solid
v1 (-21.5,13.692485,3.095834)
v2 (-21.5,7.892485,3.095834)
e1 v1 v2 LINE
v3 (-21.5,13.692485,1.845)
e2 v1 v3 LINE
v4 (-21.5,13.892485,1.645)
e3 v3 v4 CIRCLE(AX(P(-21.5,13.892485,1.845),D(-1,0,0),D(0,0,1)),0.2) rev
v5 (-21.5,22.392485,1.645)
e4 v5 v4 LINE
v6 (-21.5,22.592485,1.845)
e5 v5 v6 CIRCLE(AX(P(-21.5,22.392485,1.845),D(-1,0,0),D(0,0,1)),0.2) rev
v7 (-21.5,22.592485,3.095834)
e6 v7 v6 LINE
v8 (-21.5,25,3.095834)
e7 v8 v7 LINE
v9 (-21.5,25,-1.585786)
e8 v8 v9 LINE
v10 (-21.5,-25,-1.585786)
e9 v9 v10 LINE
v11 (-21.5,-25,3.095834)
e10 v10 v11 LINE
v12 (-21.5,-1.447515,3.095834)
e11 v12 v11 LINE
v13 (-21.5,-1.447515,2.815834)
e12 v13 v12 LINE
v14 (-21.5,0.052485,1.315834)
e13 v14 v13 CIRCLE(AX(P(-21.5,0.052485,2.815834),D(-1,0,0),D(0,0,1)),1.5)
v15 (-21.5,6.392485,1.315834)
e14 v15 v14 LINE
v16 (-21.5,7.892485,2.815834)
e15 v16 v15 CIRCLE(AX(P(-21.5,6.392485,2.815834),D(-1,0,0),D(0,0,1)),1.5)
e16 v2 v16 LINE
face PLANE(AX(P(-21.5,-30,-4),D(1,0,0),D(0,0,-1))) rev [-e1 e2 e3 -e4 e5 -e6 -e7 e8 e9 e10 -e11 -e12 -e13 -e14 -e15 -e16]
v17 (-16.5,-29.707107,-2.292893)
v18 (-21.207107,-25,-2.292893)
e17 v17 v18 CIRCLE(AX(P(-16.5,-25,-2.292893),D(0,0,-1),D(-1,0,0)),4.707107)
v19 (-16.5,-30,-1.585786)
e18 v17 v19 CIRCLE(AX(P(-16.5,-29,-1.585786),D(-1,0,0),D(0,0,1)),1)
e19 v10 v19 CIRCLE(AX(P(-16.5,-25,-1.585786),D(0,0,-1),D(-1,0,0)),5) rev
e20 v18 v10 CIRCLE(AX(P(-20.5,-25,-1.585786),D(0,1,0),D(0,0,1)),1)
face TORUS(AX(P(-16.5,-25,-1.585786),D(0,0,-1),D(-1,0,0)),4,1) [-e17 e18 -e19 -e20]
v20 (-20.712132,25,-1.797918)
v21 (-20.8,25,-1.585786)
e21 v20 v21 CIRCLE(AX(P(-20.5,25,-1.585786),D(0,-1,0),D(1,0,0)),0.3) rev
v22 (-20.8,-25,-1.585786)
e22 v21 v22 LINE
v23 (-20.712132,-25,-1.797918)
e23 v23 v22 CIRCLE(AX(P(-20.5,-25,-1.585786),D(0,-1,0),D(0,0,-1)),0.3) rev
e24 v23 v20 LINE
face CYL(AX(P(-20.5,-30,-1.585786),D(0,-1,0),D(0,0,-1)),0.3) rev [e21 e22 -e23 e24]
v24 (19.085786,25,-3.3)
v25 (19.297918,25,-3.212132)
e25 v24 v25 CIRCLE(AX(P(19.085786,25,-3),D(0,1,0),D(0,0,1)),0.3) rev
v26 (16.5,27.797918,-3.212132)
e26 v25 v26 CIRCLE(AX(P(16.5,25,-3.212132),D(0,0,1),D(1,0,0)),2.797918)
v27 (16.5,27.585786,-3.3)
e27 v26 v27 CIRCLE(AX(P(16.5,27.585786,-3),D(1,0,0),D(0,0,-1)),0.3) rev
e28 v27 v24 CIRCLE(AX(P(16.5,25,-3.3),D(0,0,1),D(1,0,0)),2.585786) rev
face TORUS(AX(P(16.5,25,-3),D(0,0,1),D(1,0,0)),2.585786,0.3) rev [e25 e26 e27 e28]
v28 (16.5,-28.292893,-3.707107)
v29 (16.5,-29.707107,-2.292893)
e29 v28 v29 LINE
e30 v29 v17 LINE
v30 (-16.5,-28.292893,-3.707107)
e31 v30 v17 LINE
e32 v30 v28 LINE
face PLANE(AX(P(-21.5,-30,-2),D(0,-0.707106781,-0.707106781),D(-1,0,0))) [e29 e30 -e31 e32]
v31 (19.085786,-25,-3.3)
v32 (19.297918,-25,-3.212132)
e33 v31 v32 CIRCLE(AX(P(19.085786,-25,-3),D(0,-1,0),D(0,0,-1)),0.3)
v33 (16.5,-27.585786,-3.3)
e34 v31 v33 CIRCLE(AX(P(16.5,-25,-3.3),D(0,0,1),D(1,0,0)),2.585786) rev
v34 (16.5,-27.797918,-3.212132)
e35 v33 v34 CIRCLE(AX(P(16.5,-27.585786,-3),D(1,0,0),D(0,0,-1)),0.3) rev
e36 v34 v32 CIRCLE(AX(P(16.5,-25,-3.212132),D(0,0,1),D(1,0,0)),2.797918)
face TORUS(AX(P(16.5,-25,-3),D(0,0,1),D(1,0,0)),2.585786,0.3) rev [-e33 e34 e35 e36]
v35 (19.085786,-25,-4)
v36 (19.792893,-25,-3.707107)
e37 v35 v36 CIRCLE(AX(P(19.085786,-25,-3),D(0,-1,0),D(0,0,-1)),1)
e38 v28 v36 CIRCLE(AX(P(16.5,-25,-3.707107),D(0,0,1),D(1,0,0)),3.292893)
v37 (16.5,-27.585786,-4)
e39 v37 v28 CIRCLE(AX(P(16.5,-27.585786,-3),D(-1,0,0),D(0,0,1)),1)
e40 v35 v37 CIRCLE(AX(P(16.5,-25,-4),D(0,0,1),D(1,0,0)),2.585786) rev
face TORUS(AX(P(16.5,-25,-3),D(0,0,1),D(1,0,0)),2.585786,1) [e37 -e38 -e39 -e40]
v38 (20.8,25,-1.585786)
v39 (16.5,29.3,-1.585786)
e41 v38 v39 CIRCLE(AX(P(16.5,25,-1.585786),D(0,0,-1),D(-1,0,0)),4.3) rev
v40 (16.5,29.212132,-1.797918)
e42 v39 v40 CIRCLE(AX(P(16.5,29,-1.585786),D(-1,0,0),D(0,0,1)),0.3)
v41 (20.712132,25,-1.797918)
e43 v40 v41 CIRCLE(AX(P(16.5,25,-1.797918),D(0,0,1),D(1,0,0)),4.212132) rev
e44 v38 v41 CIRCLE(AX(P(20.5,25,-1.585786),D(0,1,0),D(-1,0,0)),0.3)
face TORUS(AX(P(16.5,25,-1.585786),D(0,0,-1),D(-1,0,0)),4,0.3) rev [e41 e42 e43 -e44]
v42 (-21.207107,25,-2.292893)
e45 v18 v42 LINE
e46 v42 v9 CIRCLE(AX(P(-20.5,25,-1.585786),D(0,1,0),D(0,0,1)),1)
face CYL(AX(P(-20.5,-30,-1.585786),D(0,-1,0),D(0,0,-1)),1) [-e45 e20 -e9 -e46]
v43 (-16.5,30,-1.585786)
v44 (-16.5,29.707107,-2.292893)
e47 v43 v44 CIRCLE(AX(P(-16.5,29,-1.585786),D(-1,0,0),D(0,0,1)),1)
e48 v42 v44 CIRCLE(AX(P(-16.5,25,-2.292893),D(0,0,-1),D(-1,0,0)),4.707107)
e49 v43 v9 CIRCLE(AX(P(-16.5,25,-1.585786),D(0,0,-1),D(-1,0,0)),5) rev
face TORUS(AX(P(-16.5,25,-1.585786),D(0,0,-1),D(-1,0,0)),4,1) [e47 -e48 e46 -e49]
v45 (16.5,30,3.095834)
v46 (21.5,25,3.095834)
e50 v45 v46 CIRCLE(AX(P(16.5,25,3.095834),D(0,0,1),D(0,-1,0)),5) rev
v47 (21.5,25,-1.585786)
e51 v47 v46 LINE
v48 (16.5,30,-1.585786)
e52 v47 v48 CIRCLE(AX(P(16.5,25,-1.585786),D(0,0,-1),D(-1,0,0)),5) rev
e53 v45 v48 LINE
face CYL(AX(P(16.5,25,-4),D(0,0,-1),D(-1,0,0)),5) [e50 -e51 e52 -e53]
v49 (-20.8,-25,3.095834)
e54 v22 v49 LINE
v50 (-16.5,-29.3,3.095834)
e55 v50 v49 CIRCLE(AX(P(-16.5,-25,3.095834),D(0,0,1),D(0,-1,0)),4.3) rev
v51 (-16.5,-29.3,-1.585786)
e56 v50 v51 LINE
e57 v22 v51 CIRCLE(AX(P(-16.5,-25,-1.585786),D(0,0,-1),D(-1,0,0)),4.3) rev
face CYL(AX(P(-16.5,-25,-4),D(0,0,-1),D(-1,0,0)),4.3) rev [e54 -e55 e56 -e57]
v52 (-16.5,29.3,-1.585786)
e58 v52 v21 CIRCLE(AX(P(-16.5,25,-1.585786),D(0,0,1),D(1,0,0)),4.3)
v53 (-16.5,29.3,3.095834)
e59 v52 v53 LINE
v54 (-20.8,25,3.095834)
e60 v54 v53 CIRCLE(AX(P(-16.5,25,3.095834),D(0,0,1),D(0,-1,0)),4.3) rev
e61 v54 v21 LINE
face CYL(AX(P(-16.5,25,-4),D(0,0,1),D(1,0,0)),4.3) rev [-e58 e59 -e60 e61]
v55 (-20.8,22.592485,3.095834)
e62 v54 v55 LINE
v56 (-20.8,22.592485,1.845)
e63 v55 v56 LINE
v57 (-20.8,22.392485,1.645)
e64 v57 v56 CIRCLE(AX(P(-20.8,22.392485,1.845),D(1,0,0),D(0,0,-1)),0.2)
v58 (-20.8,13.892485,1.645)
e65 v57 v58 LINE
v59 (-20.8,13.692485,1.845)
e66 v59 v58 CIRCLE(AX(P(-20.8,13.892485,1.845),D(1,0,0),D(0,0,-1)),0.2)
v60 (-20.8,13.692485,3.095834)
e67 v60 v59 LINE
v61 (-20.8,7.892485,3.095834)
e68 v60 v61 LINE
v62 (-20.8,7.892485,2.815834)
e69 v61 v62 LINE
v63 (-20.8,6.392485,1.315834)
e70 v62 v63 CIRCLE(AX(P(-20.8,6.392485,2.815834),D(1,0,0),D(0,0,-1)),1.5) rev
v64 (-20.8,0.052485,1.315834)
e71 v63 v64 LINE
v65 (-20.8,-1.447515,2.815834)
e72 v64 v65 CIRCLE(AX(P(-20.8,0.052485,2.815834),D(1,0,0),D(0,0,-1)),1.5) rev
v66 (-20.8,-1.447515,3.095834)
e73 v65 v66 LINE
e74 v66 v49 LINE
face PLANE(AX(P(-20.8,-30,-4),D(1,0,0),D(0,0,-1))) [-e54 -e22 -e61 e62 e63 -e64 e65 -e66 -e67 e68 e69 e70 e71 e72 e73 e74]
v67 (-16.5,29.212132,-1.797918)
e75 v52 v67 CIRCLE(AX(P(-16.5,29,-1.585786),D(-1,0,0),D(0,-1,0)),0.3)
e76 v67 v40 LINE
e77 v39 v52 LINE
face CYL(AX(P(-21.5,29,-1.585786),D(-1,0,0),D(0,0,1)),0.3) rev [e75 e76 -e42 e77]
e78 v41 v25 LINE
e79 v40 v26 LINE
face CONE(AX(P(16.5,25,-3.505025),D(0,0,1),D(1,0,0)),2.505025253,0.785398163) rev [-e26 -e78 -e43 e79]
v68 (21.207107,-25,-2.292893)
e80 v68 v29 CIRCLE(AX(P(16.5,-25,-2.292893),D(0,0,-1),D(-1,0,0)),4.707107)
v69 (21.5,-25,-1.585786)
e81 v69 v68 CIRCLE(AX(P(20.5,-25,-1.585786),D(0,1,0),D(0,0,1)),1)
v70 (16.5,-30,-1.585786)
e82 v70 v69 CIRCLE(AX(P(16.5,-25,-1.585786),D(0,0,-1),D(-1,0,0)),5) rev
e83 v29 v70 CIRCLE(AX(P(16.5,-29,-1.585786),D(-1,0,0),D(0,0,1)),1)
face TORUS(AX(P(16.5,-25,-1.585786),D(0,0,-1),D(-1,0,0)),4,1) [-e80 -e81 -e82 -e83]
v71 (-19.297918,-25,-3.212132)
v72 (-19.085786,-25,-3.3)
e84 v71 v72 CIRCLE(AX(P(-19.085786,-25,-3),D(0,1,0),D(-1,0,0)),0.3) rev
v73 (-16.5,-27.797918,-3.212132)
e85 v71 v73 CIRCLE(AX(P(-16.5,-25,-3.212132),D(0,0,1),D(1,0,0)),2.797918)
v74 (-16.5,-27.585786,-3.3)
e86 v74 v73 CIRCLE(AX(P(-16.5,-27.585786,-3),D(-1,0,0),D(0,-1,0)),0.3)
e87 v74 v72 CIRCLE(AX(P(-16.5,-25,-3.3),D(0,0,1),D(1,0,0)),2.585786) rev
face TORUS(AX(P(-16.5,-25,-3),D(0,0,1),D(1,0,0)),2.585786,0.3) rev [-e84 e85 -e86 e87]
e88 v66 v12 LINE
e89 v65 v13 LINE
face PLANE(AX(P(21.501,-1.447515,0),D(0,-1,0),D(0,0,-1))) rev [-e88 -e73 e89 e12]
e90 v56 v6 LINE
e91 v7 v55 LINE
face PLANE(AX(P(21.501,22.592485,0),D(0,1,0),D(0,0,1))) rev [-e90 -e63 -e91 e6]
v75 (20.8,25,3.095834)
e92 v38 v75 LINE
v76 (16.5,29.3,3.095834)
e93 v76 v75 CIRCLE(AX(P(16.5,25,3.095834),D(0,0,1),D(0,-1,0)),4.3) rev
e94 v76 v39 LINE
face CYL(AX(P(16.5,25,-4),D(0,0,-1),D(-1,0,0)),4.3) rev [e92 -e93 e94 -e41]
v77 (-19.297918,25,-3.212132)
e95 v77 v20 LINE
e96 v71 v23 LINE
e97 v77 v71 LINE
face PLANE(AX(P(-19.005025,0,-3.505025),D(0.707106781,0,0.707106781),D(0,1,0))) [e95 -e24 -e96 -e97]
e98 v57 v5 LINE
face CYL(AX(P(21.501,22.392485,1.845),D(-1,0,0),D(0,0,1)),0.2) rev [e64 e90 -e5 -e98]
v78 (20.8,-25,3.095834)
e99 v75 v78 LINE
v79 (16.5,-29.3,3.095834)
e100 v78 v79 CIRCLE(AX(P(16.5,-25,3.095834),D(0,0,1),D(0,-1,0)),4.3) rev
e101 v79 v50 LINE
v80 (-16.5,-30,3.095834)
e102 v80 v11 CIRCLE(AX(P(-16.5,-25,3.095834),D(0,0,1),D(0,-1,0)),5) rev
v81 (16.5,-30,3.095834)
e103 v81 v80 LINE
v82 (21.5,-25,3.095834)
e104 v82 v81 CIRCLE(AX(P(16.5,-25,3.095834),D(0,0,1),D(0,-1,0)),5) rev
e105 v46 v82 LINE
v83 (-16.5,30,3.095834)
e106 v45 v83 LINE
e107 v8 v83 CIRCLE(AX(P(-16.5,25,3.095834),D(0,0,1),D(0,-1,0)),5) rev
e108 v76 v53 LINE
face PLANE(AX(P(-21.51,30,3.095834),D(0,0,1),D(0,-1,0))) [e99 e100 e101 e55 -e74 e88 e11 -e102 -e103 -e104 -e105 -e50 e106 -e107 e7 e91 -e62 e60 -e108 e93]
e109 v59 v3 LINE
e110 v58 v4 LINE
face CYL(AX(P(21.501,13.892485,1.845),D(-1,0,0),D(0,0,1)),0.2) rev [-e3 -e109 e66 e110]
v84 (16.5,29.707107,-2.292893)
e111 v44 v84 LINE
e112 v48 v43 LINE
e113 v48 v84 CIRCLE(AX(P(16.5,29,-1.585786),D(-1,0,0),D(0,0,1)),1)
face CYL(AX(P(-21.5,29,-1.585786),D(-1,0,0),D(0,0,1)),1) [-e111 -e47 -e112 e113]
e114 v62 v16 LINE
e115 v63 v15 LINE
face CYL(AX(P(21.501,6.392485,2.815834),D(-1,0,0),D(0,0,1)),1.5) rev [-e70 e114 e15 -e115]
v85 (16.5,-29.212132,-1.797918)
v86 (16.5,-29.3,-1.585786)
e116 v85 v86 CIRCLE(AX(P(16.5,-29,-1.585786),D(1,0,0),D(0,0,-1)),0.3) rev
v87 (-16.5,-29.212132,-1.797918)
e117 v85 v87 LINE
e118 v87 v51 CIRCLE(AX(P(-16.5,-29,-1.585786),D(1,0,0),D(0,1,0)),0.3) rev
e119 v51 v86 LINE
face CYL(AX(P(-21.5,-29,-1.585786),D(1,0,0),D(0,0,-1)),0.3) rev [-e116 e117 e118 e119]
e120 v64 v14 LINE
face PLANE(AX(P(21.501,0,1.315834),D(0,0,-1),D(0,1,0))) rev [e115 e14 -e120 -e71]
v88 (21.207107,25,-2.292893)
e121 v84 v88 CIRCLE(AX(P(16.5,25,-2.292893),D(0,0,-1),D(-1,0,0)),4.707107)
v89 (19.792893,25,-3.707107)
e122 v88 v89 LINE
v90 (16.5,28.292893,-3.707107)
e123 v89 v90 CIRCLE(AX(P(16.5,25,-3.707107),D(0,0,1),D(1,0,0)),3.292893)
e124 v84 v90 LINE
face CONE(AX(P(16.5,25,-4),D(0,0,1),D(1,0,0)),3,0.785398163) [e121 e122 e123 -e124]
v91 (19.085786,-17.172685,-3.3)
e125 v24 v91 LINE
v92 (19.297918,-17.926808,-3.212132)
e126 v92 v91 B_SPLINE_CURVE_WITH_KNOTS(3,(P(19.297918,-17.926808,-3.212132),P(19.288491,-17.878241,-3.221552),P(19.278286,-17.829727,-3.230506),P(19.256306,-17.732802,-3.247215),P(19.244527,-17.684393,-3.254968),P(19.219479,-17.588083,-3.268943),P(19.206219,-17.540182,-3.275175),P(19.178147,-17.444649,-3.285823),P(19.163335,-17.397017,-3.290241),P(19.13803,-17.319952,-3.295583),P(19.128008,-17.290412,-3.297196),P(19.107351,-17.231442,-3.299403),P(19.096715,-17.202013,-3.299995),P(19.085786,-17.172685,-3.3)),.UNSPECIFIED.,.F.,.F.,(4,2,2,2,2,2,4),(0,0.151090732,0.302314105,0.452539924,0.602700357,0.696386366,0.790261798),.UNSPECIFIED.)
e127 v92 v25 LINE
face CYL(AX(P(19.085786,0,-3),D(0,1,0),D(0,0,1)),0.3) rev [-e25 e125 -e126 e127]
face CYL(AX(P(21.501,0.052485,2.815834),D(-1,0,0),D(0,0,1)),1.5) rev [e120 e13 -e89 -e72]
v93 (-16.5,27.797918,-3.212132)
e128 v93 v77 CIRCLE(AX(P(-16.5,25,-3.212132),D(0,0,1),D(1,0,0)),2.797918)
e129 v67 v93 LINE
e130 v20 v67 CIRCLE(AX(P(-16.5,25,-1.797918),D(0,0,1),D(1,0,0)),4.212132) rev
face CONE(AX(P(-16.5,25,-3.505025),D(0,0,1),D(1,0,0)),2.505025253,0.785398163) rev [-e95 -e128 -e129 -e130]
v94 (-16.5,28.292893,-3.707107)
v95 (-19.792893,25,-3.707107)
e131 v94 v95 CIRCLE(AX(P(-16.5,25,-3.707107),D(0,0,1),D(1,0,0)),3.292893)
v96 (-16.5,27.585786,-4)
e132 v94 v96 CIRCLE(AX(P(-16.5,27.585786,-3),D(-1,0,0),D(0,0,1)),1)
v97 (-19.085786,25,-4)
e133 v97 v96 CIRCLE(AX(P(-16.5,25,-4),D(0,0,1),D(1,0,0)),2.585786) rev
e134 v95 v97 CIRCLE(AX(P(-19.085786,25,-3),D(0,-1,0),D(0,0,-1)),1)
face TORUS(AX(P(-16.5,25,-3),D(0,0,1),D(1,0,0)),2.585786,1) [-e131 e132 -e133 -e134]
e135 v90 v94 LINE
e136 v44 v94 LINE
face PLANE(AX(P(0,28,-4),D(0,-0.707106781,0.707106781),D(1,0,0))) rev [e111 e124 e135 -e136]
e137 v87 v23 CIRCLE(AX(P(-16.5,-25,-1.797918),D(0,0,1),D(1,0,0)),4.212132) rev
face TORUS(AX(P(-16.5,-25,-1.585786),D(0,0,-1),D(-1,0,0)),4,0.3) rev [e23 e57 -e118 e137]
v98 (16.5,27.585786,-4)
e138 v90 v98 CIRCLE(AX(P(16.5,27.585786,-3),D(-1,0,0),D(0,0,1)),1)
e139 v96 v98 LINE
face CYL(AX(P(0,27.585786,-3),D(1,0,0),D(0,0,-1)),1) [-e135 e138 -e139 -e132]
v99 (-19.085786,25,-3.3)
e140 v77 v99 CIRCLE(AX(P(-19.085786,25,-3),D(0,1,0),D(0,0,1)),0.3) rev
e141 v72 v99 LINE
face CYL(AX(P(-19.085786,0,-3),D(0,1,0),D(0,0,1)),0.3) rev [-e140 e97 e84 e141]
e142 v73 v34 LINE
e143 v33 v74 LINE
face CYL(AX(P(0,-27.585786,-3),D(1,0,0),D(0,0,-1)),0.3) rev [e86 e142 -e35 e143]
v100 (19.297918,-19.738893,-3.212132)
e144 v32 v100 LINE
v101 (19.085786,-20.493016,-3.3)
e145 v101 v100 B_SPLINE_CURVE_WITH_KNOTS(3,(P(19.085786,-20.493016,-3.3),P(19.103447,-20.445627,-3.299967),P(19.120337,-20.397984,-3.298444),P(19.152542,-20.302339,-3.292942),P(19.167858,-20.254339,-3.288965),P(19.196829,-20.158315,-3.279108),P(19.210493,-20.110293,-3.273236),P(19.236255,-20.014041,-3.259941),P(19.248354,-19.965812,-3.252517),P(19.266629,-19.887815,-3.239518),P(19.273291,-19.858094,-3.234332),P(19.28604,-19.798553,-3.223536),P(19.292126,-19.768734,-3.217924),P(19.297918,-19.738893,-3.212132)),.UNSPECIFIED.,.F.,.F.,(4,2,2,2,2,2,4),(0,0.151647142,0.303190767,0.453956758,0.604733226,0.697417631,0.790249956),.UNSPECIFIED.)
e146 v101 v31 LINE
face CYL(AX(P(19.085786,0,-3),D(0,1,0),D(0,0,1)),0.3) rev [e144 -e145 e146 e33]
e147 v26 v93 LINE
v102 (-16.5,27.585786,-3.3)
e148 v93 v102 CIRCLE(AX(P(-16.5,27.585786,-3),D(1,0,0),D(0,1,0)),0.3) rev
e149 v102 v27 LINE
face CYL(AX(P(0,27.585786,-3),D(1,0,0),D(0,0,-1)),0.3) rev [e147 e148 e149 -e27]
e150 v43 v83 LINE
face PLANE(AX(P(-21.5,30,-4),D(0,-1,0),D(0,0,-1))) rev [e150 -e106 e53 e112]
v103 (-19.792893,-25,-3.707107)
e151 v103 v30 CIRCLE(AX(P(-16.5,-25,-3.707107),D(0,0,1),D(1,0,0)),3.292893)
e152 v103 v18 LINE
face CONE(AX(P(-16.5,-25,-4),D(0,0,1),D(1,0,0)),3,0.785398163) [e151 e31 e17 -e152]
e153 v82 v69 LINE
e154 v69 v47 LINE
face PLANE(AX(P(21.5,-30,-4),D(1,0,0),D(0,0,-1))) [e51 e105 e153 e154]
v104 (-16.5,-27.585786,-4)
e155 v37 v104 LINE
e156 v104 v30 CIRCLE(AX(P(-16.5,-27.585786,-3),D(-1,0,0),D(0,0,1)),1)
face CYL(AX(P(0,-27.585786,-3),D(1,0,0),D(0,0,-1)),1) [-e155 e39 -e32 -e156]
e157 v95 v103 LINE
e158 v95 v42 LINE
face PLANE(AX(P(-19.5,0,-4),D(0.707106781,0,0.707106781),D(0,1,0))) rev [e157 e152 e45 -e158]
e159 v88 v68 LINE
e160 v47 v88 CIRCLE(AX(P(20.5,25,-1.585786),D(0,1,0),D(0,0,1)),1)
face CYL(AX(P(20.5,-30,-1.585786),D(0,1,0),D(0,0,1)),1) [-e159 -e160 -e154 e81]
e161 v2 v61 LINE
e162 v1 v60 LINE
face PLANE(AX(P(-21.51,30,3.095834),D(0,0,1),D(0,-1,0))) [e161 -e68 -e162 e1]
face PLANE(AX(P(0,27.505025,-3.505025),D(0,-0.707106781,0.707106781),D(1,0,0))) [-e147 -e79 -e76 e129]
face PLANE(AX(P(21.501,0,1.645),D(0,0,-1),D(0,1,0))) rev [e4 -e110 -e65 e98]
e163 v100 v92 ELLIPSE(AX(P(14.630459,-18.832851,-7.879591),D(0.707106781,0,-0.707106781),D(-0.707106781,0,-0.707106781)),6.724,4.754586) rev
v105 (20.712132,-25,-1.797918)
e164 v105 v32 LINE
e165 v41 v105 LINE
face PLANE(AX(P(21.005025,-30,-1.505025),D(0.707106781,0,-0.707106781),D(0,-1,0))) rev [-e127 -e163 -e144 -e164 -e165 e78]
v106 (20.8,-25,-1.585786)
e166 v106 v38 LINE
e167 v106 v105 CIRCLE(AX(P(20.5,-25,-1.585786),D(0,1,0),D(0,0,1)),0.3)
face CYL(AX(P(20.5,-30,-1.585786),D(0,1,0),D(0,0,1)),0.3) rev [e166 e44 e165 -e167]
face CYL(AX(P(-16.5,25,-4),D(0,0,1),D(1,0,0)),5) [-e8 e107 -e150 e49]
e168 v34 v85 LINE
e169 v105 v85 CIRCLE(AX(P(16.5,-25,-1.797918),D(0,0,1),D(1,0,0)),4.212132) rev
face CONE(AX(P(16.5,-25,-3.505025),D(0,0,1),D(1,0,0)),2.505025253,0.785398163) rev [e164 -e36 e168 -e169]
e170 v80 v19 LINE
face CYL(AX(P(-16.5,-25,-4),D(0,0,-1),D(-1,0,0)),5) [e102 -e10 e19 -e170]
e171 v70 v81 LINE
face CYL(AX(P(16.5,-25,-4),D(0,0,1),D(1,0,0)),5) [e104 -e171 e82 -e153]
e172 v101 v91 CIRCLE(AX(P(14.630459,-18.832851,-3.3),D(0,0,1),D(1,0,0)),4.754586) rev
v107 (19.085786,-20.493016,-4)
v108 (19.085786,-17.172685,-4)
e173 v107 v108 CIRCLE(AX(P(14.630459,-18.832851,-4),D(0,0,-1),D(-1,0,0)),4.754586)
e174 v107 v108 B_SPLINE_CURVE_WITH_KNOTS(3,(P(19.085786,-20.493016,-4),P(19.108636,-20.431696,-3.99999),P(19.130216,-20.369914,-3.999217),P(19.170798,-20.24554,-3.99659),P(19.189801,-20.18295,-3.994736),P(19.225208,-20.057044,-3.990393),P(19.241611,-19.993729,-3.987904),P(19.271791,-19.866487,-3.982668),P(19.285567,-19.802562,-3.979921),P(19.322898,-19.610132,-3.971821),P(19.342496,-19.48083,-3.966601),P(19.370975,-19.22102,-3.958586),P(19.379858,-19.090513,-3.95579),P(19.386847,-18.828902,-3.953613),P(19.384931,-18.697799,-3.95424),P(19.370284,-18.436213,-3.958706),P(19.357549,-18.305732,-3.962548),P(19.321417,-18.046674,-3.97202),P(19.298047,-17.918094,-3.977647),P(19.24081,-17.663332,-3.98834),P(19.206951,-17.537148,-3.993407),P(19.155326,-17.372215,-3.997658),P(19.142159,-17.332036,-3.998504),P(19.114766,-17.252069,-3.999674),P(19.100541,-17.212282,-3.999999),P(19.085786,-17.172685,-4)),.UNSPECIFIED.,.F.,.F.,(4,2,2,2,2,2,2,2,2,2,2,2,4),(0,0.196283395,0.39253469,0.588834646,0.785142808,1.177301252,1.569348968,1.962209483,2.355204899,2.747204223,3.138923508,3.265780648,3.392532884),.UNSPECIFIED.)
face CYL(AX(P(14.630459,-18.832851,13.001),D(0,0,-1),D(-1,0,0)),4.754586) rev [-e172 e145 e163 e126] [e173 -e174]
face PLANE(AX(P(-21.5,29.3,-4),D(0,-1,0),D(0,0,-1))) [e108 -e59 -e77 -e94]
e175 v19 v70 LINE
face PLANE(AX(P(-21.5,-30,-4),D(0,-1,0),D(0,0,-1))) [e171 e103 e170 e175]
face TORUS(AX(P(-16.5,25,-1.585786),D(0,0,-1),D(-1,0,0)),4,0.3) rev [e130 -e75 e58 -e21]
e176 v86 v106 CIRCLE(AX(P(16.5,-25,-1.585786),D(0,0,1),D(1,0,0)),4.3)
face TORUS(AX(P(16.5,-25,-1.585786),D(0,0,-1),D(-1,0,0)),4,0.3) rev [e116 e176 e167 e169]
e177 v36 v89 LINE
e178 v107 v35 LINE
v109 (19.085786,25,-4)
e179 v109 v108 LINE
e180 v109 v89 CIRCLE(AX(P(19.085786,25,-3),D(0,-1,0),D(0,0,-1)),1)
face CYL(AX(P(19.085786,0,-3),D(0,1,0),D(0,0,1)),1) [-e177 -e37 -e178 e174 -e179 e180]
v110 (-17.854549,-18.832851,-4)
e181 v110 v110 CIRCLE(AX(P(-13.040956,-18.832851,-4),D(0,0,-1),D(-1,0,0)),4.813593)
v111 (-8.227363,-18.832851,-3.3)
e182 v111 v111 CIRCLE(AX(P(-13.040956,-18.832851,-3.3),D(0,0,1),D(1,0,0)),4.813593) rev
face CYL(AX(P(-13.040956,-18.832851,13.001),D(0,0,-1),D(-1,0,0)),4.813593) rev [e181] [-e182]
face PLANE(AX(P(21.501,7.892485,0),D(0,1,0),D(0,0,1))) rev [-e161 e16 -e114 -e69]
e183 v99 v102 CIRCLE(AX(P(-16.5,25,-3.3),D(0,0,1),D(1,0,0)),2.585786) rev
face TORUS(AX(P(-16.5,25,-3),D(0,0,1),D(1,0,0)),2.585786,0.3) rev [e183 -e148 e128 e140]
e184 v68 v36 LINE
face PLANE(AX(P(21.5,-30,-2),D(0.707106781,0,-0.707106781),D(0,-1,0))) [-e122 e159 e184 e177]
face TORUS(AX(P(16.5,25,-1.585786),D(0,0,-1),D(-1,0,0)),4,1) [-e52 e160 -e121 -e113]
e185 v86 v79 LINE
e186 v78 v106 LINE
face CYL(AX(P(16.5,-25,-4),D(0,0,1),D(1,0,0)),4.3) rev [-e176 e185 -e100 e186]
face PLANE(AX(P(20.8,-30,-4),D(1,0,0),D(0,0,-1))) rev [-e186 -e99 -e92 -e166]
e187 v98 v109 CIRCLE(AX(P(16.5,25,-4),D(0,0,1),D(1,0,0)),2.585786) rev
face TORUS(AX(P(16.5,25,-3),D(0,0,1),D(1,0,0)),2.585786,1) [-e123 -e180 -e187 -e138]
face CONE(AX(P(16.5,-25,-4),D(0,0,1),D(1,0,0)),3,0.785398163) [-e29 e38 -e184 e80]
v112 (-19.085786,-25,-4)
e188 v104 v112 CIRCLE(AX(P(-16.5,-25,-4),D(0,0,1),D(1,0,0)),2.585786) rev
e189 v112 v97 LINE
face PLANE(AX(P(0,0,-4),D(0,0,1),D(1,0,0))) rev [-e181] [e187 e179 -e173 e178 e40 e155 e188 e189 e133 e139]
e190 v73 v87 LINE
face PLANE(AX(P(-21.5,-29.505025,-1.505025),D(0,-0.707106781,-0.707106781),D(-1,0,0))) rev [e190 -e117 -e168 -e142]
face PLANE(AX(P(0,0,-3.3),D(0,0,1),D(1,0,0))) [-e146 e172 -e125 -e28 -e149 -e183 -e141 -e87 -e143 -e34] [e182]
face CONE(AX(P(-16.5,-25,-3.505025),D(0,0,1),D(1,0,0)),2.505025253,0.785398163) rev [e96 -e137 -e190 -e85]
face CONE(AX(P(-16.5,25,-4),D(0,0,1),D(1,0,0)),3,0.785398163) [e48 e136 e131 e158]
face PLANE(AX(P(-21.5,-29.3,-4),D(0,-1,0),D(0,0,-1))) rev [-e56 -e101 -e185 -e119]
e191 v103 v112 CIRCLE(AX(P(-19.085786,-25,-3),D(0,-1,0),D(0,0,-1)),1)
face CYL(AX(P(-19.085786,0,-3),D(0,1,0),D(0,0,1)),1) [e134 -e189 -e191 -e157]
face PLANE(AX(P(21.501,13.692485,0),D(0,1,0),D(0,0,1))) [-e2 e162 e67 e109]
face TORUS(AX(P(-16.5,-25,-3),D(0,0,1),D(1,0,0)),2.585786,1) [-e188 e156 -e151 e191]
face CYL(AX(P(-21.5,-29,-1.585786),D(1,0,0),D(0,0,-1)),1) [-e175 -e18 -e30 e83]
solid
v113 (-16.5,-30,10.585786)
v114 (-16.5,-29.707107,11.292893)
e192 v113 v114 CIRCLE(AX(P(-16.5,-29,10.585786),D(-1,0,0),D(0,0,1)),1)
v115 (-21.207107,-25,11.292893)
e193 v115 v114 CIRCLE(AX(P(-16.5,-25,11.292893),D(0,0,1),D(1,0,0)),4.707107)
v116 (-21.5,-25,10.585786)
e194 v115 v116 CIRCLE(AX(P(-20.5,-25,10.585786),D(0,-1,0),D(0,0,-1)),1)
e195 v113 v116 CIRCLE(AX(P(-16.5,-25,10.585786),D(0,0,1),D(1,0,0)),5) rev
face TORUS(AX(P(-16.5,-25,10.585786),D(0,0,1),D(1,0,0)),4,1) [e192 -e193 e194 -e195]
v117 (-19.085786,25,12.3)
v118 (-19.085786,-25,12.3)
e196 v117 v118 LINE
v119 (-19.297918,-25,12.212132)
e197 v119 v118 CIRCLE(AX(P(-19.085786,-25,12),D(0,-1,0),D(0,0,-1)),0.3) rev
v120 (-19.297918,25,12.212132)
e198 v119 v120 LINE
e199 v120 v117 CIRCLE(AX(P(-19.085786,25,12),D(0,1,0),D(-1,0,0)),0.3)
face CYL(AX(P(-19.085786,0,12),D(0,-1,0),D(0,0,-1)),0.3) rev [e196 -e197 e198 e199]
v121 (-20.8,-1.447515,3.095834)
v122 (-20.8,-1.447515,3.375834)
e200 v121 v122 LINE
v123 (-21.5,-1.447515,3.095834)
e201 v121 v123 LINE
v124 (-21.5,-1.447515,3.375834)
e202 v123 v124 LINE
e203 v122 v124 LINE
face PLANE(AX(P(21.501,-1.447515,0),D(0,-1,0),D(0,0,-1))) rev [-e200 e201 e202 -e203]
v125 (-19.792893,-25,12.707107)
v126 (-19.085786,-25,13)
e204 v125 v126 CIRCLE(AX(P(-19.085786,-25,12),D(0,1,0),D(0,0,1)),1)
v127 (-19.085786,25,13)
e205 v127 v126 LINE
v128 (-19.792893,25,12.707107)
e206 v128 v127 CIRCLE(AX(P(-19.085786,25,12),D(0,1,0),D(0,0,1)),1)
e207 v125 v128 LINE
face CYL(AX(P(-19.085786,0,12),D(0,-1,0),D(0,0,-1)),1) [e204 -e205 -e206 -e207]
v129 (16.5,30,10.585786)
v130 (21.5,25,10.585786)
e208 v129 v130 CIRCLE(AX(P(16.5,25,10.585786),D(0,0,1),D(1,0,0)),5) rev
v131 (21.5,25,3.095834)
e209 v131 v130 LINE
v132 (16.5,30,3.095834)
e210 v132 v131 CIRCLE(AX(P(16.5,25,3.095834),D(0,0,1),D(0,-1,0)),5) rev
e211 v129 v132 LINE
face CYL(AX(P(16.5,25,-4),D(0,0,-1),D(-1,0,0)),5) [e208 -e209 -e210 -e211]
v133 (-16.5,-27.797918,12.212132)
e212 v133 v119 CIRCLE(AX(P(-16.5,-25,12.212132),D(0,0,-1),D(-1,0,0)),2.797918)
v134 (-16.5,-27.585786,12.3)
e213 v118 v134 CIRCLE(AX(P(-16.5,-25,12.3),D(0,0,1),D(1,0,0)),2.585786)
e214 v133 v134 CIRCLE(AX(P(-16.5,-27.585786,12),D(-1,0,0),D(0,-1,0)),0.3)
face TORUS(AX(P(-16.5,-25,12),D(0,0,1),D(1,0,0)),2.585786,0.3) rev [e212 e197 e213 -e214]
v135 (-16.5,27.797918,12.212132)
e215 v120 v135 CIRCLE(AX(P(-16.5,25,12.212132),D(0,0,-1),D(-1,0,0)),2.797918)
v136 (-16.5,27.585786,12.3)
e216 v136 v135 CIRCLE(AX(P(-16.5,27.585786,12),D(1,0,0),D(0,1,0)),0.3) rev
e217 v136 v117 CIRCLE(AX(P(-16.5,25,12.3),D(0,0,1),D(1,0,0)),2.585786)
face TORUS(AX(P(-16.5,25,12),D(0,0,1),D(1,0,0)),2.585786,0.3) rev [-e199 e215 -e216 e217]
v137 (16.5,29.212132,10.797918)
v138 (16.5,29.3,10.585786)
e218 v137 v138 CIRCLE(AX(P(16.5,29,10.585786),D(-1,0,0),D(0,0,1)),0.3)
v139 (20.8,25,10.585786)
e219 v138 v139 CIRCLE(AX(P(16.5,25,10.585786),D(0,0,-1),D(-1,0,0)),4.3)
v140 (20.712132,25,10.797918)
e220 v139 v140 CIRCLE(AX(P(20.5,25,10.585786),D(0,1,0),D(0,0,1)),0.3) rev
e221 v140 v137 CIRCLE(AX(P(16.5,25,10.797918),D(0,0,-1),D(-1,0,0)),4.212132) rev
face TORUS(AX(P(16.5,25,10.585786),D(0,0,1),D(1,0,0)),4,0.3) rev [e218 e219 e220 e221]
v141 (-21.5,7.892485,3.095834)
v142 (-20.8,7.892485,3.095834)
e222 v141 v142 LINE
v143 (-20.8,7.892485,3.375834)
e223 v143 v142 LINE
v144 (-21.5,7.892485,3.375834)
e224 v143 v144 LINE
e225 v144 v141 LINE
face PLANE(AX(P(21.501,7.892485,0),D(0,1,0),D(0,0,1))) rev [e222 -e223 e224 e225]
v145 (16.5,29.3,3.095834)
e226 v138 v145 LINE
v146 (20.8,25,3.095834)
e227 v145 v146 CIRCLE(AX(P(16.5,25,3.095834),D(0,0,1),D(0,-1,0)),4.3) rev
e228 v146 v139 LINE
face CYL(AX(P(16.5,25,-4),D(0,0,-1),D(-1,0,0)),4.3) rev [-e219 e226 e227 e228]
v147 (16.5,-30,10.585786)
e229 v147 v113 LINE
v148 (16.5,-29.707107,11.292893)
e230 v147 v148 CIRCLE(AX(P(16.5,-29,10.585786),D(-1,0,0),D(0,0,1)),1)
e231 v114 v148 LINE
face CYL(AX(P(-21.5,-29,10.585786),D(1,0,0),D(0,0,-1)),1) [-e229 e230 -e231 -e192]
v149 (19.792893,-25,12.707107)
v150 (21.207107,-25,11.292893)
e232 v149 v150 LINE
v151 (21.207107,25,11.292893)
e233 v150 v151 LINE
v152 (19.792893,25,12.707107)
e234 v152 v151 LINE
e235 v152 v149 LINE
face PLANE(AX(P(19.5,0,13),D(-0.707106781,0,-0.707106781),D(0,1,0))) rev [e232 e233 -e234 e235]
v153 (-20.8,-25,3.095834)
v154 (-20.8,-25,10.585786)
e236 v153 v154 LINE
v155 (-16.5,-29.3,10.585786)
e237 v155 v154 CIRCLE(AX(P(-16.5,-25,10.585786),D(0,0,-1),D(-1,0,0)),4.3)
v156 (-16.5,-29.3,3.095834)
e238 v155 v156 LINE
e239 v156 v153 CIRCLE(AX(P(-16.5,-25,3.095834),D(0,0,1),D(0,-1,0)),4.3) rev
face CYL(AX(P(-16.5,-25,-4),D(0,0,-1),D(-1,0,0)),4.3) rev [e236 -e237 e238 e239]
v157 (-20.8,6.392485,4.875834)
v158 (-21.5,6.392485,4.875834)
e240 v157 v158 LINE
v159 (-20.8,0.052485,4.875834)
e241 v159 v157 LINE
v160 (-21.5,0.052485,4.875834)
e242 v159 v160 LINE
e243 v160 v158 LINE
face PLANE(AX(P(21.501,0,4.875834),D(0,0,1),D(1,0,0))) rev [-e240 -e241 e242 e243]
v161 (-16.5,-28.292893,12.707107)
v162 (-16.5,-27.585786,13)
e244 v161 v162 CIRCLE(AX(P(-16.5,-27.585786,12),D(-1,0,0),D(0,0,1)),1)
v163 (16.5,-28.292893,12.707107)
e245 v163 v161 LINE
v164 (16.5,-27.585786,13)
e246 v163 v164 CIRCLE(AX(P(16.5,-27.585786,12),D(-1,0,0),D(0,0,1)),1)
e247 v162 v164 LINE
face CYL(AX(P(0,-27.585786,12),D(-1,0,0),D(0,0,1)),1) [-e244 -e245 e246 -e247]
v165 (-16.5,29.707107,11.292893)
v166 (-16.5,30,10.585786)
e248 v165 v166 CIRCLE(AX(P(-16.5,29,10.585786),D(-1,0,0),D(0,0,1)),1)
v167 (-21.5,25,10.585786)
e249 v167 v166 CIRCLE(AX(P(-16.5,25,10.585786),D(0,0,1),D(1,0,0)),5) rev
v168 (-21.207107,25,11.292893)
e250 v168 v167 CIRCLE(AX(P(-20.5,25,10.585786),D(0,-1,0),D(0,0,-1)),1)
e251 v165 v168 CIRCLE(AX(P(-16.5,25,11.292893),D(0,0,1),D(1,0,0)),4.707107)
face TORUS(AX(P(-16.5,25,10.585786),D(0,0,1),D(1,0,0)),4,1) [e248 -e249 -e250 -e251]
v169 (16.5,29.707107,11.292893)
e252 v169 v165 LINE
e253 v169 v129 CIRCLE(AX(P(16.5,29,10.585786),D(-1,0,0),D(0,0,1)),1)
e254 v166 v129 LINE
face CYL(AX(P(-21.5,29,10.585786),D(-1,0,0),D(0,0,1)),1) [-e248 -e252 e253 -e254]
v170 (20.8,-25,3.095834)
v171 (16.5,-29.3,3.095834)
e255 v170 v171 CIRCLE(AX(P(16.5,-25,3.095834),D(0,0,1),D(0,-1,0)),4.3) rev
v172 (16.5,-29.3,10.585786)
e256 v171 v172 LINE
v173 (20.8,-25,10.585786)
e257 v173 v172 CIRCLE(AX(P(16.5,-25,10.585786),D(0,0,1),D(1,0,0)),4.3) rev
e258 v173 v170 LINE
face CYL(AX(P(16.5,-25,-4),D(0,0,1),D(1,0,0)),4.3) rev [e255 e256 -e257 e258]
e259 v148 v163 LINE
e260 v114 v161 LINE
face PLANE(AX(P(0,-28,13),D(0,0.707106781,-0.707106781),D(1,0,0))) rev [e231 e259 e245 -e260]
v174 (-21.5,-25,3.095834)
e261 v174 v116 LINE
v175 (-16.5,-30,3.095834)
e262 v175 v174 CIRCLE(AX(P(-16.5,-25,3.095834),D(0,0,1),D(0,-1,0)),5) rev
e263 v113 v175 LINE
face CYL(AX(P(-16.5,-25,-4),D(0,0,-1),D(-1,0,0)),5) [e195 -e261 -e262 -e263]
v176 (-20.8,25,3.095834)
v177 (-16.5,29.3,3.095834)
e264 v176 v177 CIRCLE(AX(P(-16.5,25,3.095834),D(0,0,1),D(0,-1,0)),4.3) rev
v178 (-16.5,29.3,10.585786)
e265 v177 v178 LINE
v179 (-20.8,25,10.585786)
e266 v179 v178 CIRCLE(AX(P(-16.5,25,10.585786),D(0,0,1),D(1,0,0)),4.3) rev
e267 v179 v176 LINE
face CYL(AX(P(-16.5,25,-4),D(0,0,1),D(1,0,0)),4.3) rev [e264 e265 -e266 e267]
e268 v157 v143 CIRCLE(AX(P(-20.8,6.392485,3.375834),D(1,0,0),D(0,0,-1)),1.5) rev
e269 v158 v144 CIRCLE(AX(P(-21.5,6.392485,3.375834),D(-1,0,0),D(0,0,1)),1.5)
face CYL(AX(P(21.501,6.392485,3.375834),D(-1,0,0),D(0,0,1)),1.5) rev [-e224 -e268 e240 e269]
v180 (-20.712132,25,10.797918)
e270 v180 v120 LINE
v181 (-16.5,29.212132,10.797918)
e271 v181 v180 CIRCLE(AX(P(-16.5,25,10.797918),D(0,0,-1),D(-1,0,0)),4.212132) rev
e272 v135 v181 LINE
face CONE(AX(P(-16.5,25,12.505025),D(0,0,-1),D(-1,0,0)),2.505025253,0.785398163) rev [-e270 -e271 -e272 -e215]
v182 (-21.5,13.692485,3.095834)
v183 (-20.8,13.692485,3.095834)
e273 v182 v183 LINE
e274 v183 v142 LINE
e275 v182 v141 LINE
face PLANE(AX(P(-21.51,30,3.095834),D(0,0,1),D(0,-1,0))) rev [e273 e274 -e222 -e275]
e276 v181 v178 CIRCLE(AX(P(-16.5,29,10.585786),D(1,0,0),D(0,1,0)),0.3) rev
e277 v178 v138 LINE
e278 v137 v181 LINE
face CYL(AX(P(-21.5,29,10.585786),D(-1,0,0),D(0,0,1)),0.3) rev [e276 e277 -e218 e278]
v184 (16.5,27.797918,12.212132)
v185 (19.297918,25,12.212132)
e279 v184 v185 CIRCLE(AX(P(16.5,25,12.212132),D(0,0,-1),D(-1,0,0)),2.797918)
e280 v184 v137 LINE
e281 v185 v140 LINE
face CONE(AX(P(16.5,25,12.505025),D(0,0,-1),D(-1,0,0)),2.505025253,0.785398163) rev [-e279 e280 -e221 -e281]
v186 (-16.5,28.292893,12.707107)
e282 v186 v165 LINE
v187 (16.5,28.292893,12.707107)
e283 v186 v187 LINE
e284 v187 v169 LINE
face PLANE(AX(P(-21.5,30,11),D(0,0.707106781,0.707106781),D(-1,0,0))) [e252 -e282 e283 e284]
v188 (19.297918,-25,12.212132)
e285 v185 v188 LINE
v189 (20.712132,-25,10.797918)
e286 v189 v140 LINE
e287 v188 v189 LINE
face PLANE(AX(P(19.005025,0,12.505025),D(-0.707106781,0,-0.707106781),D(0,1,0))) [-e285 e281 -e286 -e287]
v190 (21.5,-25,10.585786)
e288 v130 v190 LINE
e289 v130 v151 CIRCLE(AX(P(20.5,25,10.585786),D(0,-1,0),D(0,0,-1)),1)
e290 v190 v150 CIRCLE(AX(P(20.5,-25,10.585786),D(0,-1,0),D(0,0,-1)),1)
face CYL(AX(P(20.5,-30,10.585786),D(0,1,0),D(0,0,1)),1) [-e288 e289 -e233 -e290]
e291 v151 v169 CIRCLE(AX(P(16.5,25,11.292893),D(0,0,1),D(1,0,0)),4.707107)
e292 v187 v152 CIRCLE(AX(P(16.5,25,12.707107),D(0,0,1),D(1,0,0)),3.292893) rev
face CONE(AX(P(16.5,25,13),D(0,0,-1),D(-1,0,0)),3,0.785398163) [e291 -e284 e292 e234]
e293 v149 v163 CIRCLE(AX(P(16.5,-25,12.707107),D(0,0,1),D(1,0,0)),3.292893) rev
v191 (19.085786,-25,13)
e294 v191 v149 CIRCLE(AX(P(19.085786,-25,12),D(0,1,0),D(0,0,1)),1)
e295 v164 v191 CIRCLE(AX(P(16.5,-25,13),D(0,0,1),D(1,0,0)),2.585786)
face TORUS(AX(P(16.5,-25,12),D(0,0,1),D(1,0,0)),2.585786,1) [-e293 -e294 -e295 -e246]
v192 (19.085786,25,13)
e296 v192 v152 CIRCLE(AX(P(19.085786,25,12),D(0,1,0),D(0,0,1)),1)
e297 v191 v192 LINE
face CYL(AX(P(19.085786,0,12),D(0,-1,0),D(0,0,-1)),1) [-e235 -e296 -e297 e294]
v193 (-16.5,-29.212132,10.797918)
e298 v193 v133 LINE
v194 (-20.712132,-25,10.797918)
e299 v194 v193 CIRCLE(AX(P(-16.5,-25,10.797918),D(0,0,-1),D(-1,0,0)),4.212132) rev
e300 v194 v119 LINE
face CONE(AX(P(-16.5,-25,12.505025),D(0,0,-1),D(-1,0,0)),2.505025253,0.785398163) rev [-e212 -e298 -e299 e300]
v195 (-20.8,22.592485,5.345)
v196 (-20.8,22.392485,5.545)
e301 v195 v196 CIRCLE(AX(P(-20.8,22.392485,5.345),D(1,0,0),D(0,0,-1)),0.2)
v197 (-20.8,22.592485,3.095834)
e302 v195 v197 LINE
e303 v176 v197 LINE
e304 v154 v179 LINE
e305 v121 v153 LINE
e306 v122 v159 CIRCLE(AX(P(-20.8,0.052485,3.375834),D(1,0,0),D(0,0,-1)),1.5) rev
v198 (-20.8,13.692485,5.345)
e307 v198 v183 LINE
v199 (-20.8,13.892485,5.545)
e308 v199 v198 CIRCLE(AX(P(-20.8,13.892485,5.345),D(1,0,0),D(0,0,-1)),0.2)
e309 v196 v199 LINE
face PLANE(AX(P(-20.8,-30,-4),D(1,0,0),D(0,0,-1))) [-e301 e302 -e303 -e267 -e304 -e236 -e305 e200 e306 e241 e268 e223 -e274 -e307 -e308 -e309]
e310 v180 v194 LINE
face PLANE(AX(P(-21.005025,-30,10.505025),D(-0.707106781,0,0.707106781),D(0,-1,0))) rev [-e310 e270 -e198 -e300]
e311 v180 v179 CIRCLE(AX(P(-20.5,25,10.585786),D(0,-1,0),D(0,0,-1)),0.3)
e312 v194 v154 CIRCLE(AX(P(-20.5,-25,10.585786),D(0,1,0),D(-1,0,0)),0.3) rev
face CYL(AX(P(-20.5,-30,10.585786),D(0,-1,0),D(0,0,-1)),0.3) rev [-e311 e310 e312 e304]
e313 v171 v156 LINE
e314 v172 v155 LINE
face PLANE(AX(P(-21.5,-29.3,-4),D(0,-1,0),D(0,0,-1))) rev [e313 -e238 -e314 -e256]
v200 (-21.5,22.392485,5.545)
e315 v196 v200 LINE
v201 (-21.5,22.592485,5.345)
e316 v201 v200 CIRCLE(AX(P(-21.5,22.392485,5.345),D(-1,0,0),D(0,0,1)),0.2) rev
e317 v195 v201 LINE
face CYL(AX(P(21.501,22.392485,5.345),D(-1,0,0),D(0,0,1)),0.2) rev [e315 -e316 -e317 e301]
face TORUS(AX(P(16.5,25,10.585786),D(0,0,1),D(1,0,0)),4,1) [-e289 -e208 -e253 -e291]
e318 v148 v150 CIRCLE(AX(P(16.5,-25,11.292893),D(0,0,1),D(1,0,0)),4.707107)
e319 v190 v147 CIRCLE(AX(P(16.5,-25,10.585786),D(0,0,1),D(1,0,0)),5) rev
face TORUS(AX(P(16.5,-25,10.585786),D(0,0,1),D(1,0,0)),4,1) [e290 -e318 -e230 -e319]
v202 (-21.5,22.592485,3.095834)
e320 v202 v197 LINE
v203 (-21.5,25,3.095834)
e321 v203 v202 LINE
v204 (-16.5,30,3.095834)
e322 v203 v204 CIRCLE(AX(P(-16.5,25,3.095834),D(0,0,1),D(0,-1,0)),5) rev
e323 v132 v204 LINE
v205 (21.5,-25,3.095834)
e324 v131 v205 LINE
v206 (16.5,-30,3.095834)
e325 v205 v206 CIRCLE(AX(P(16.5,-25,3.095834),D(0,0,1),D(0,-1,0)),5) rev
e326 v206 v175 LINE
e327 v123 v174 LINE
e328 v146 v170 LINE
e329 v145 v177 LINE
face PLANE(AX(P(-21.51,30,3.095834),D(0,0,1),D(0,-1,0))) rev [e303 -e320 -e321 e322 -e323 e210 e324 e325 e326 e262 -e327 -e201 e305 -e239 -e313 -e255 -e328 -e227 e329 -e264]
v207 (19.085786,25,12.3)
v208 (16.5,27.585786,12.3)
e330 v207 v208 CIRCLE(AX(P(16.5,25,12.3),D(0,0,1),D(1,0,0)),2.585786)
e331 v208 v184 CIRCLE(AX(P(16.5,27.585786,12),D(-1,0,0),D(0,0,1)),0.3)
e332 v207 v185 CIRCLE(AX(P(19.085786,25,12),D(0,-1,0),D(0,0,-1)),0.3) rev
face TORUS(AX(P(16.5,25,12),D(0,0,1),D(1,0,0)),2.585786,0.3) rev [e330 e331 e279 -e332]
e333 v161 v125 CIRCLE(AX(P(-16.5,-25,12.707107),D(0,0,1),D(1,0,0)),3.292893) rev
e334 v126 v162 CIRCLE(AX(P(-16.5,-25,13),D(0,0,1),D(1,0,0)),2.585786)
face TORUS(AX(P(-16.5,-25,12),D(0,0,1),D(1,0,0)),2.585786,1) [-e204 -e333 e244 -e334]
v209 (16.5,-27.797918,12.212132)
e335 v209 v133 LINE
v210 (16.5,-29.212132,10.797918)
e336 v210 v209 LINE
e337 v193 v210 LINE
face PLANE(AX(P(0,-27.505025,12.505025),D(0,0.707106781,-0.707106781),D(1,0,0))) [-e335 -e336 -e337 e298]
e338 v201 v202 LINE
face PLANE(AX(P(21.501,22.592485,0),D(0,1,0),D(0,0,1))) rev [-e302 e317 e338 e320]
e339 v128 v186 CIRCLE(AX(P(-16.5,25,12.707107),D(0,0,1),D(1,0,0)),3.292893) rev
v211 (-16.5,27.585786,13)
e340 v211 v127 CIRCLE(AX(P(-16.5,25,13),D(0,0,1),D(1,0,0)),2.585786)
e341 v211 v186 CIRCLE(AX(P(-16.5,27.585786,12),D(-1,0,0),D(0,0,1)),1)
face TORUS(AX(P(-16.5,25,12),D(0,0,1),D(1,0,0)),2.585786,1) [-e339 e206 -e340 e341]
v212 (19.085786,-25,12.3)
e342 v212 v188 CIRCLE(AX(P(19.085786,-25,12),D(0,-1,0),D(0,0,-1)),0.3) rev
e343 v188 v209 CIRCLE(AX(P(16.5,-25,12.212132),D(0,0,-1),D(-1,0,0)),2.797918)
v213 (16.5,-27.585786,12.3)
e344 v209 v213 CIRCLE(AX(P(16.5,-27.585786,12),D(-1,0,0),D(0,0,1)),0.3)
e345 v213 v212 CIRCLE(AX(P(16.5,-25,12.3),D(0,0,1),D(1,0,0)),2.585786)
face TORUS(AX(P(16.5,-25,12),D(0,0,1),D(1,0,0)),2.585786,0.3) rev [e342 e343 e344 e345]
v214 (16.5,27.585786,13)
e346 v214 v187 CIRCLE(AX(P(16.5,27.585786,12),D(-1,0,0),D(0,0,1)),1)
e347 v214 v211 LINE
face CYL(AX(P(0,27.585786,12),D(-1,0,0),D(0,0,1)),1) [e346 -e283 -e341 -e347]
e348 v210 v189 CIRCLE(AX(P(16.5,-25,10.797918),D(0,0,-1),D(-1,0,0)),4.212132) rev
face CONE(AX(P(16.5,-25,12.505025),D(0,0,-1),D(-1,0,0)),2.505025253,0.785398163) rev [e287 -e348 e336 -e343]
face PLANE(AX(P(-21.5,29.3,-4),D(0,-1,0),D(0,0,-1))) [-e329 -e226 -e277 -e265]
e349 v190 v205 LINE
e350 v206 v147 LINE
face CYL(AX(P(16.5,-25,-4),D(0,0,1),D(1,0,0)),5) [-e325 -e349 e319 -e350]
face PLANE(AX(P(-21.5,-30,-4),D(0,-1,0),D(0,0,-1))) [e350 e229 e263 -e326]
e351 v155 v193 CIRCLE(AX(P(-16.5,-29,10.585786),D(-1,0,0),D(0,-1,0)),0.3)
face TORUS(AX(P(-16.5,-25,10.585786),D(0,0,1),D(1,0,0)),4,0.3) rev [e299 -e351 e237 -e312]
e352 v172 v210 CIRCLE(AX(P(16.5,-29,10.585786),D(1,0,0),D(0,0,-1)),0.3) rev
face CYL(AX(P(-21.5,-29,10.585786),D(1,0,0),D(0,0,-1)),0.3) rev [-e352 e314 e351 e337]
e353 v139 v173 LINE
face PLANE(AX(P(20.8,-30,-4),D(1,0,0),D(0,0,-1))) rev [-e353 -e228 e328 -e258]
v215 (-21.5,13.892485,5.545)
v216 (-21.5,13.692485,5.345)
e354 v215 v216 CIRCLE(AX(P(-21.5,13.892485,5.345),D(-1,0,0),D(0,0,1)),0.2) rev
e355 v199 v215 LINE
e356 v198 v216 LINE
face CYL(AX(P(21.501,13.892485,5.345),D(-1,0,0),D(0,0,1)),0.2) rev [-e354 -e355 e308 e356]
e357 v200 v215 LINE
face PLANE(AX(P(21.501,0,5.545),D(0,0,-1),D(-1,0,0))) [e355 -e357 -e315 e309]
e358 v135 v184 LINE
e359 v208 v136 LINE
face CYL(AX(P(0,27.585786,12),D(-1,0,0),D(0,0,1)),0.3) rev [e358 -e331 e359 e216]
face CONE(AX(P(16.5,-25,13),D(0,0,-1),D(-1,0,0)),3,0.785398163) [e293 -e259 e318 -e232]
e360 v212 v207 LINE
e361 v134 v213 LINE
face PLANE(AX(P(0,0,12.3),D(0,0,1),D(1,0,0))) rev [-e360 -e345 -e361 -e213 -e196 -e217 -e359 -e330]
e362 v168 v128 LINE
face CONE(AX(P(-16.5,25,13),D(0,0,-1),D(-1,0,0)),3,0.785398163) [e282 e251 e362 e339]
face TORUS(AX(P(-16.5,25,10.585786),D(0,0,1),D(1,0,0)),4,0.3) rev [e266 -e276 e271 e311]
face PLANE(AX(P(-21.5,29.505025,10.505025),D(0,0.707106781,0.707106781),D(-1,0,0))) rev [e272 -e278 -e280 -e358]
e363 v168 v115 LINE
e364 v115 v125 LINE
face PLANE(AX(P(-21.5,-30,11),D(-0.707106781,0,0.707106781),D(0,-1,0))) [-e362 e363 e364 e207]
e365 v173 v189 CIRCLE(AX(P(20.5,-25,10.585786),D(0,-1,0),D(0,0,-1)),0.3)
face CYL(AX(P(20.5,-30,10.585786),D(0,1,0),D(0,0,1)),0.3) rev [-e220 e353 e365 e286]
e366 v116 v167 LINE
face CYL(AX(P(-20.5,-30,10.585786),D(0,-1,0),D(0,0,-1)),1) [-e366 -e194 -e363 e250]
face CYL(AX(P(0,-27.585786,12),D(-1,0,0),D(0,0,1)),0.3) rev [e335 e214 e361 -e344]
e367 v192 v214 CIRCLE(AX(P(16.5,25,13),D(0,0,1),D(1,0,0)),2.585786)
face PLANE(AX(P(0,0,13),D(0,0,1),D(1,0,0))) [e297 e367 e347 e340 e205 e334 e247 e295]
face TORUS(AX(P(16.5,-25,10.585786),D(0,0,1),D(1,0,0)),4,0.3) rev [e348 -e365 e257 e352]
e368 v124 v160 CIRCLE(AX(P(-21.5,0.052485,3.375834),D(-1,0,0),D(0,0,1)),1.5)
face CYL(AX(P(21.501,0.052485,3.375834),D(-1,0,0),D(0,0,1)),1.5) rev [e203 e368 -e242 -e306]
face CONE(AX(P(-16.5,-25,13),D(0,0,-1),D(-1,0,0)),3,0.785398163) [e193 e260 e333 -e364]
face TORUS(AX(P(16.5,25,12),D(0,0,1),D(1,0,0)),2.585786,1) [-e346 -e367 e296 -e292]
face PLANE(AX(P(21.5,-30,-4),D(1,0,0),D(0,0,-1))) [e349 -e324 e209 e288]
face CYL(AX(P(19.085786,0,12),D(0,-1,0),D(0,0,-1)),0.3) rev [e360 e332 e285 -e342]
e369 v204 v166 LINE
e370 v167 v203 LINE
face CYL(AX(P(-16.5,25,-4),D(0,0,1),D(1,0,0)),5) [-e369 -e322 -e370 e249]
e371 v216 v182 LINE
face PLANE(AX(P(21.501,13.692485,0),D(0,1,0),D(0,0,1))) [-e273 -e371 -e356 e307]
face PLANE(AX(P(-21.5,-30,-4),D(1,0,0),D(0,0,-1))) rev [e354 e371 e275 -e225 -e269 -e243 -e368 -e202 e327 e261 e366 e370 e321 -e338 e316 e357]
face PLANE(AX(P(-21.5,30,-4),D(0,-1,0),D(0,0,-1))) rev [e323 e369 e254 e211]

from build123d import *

# Parameters (mm, degrees)
BOSS_EXTRUDE1_DEPTH      = 13
BOSS_EXTRUDE1_DEPTH_BACK = 4
SKETCH1_W                = 43
SKETCH1_H                = 60
FILLET1_R                = 5
CHAMFER1_SIZE            = 2
FILLET2_R                = 1
SHELL1_T                 = 0.7
CUT_EXTRUDE1_REACH       = 56.019
SPLIT1_SURFACE_1_BACK    = 76.75
SPLIT1_SURFACE_1_DEPTH   = 153.5
SPLIT1_SURFACE_2_BACK    = 76.75
SPLIT1_SURFACE_2_DEPTH   = 153.5


with BuildPart() as part:
    # Sketch1 → Boss-Extrude1 (new, two sides: drawn at the far end of the back side and taken through both)
    with BuildSketch(Plane.XY.offset(-BOSS_EXTRUDE1_DEPTH_BACK)):
        Rectangle(SKETCH1_W, SKETCH1_H)
    extrude(amount=BOSS_EXTRUDE1_DEPTH + BOSS_EXTRUDE1_DEPTH_BACK)

    # Fillet1
    fillet1_edges = [part.edges().sort_by_distance(p)[0] for p in [
        (-21.5, -30, 4.5),
        (-21.5, 30, 4.5),
        (21.5, 30, 4.5),
        (21.5, -30, 4.5),
    ]]
    fillet(fillet1_edges, radius=FILLET1_R)

    # Chamfer1
    chamfer1_edges = [part.edges().sort_by_distance(p)[0] for p in [
        (0, 30, 13),
        (0, 30, -4),
        (0, -30, 13),
        (21.5, 0, 13),
        (-21.5, 0, 13),
        (-20.035533906, -28.535533906, 13),
        (20.035533906, -28.535533906, 13),
        (20.035533906, 28.535533906, 13),
        (-20.035533906, 28.535533906, 13),
        (-21.5, 0, -4),
        (0, -30, -4),
        (21.5, 0, -4),
        (-20.035533906, -28.535533906, -4),
        (20.035533906, -28.535533906, -4),
        (20.035533906, 28.535533906, -4),
        (-20.035533906, 28.535533906, -4),
    ]]
    chamfer(chamfer1_edges, length=CHAMFER1_SIZE)

    # Fillet2
    fillet2_edges = [part.edges().sort_by_distance(p)[0] for p in [
        (-19.5, 0, -4),
        (-18.621320344, -27.121320344, -4),
        (0, -28, -4),
        (18.621320344, -27.121320344, -4),
        (19.5, 0, -4),
        (18.621320344, 27.121320344, -4),
        (0, 28, -4),
        (-18.621320344, 27.121320344, -4),
        (-20.035533906, 28.535533906, 11),
        (-20.035533906, 28.535533906, -2),
        (0, 30, 11),
        (0, 30, -2),
        (20.035533906, 28.535533906, 11),
        (20.035533906, 28.535533906, -2),
        (21.5, 0, 11),
        (21.5, 0, -2),
        (20.035533906, -28.535533906, 11),
        (20.035533906, -28.535533906, -2),
        (0, -30, 11),
        (0, -30, -2),
        (-20.035533906, -28.535533906, 11),
        (-20.035533906, -28.535533906, -2),
        (-21.5, 0, 11),
        (-21.5, 0, -2),
        (-19.5, 0, 13),
        (-18.621320344, -27.121320344, 13),
        (0, -28, 13),
        (18.621320344, -27.121320344, 13),
        (19.5, 0, 13),
        (18.621320344, 27.121320344, 13),
        (0, 28, 13),
        (-18.621320344, 27.121320344, 13),
    ]]
    fillet(fillet2_edges, radius=FILLET2_R)

    # Shell1 (no face opened: a closed hollow body)
    add(offset(amount=-SHELL1_T, mode=Mode.PRIVATE), mode=Mode.SUBTRACT)

    # Sketch3 → Cut-Extrude1 (cut, up to next)
    with BuildSketch(Plane.ZY.offset(21.5), mode=Mode.PRIVATE) as cut_extrude1_sk1:
        with BuildLine():
            Line((1.31583373, 3.192485), (1.31583373, 0.052485))
            ThreePointArc((1.31583373, 0.052485), (1.755173559, -1.008175172), (2.81583373, -1.447515))
            Line((2.81583373, -1.447515), (3.37583373, -1.447515))
            ThreePointArc((3.37583373, -1.447515), (4.436493902, -1.008175172), (4.87583373, 0.052485))
            Line((4.87583373, 0.052485), (4.87583373, 6.392485))
            ThreePointArc((4.87583373, 6.392485), (4.436493902, 7.453145172), (3.37583373, 7.892485))
            Line((3.37583373, 7.892485), (2.81583373, 7.892485))
            ThreePointArc((2.81583373, 7.892485), (1.755173559, 7.453145172), (1.31583373, 6.392485))
            Line((1.31583373, 6.392485), (1.31583373, 3.202485))
            Line((1.31583373, 3.202485), (1.31583373, 3.192485))
        make_face()
    cut_extrude1_tool1 = extrude(cut_extrude1_sk1.sketch, amount=-CUT_EXTRUDE1_REACH, mode=Mode.PRIVATE) & part.part
    # Sketch3 → Cut-Extrude1 (cut, up to next)
    with BuildSketch(Plane.ZY.offset(21.5), mode=Mode.PRIVATE) as cut_extrude1_sk2:
        with BuildLine():
            Line((5.545, 22.392485), (5.545, 13.892485))
            ThreePointArc((5.545, 13.892485), (5.486421356, 13.751063644), (5.345, 13.692485))
            Line((5.345, 13.692485), (1.845, 13.692485))
            ThreePointArc((1.845, 13.692485), (1.703578644, 13.751063644), (1.645, 13.892485))
            Line((1.645, 13.892485), (1.645, 22.392485))
            ThreePointArc((1.645, 22.392485), (1.703578644, 22.533906356), (1.845, 22.592485))
            Line((1.845, 22.592485), (5.345, 22.592485))
            ThreePointArc((5.345, 22.592485), (5.486421356, 22.533906356), (5.545, 22.392485))
        make_face()
    cut_extrude1_tool2 = extrude(cut_extrude1_sk2.sketch, amount=-CUT_EXTRUDE1_REACH, mode=Mode.PRIVATE) & part.part
    add(cut_extrude1_tool1.solids().sort_by_distance((-21.5, 3.222485, 3.095834))[0], mode=Mode.SUBTRACT)
    add(cut_extrude1_tool2.solids().sort_by_distance((-21.5, 18.142485, 3.595))[0], mode=Mode.SUBTRACT)

    # Cut-Extrude3: read off the stored shape, not the designer's step
    # Cut-Extrude3: loft between two sections, ruled curve by curve
    cut_extrude3_from = [
        Edge.make_three_point_arc((19.085786438, -20.493015779, -3.124764429), (12.970294127, -23.288177809, -3.124764429), (10.175132098, -17.172685499, -3.124764429)),
        Edge.make_three_point_arc((10.175132098, -17.172685499, -3.124764429), (16.290624408, -14.377523469, -3.124764429), (19.085786438, -20.493015779, -3.124764429)),
    ]
    cut_extrude3_to = [
        Edge.make_three_point_arc((19.085786438, -20.493015779, -4), (12.970294127, -23.288177809, -4), (10.175132098, -17.172685499, -4)),
        Edge.make_three_point_arc((10.175132098, -17.172685499, -4), (16.290624408, -14.377523469, -4), (19.085786438, -20.493015779, -4)),
    ]
    cut_extrude3 = Solid(Shell([*[Face.make_surface_from_curves(cut_extrude3_from[k], cut_extrude3_to[k]) for k in range(2)], Face(Wire(cut_extrude3_from)), Face(Wire(cut_extrude3_to))]))
    add(cut_extrude3, mode=Mode.SUBTRACT)

    # Cut-Extrude3 2: loft between two sections, ruled curve by curve
    cut_extrude3_2_from = [
        Edge.make_three_point_arc((-17.854548957, -18.832850639, -3.3), (-13.040956, -14.019257681, -3.3), (-8.227363043, -18.832850639, -3.3)),
        Edge.make_three_point_arc((-8.227363043, -18.832850639, -3.3), (-13.040956, -23.646443596, -3.3), (-17.854548957, -18.832850639, -3.3)),
    ]
    cut_extrude3_2_to = [
        Edge.make_three_point_arc((-17.854548957, -18.832850639, -4), (-13.040956, -14.019257681, -4), (-8.227363043, -18.832850639, -4)),
        Edge.make_three_point_arc((-8.227363043, -18.832850639, -4), (-13.040956, -23.646443596, -4), (-17.854548957, -18.832850639, -4)),
    ]
    cut_extrude3_2 = Solid(Shell([*[Face.make_surface_from_curves(cut_extrude3_2_from[k], cut_extrude3_2_to[k]) for k in range(2)], Face(Wire(cut_extrude3_2_from)), Face(Wire(cut_extrude3_2_to))]))
    add(cut_extrude3_2, mode=Mode.SUBTRACT)


with BuildPart() as body_2:
    # Split1: the piece behind the surface
    add(part.part)
    # Split1 surface: a surface, the sketch's curves swept straight by 153.5 mm
    with BuildLine(Plane(origin=(0, 0, 0), x_dir=(0, 0, -1), z_dir=(1, 0, 0)).offset(-SPLIT1_SURFACE_1_BACK), mode=Mode.PRIVATE) as split1_surface_1_path:
        Line((-3.09583373, 30), (-3.09583373, -30))
    split1_surface_1 = Shell.extrude(split1_surface_1_path.wire(), (1 * SPLIT1_SURFACE_1_DEPTH, 0 * SPLIT1_SURFACE_1_DEPTH, 0 * SPLIT1_SURFACE_1_DEPTH))
    split(bisect_by=split1_surface_1, keep=Keep.BOTTOM)


with BuildPart() as part_1:
    add(part.part)

    # Split1: split by a surface, the side it looks to stays
    # Split1 surface: a surface, the sketch's curves swept straight by 153.5 mm
    with BuildLine(Plane(origin=(0, 0, 0), x_dir=(0, 0, -1), z_dir=(1, 0, 0)).offset(-SPLIT1_SURFACE_2_BACK), mode=Mode.PRIVATE) as split1_surface_2_path:
        Line((-3.09583373, 30), (-3.09583373, -30))
    split1_surface_2 = Shell.extrude(split1_surface_2_path.wire(), (1 * SPLIT1_SURFACE_2_DEPTH, 0 * SPLIT1_SURFACE_2_DEPTH, 0 * SPLIT1_SURFACE_2_DEPTH))
    split(bisect_by=split1_surface_2, keep=Keep.TOP)


solid = Compound([body_2.part, part_1.part])
